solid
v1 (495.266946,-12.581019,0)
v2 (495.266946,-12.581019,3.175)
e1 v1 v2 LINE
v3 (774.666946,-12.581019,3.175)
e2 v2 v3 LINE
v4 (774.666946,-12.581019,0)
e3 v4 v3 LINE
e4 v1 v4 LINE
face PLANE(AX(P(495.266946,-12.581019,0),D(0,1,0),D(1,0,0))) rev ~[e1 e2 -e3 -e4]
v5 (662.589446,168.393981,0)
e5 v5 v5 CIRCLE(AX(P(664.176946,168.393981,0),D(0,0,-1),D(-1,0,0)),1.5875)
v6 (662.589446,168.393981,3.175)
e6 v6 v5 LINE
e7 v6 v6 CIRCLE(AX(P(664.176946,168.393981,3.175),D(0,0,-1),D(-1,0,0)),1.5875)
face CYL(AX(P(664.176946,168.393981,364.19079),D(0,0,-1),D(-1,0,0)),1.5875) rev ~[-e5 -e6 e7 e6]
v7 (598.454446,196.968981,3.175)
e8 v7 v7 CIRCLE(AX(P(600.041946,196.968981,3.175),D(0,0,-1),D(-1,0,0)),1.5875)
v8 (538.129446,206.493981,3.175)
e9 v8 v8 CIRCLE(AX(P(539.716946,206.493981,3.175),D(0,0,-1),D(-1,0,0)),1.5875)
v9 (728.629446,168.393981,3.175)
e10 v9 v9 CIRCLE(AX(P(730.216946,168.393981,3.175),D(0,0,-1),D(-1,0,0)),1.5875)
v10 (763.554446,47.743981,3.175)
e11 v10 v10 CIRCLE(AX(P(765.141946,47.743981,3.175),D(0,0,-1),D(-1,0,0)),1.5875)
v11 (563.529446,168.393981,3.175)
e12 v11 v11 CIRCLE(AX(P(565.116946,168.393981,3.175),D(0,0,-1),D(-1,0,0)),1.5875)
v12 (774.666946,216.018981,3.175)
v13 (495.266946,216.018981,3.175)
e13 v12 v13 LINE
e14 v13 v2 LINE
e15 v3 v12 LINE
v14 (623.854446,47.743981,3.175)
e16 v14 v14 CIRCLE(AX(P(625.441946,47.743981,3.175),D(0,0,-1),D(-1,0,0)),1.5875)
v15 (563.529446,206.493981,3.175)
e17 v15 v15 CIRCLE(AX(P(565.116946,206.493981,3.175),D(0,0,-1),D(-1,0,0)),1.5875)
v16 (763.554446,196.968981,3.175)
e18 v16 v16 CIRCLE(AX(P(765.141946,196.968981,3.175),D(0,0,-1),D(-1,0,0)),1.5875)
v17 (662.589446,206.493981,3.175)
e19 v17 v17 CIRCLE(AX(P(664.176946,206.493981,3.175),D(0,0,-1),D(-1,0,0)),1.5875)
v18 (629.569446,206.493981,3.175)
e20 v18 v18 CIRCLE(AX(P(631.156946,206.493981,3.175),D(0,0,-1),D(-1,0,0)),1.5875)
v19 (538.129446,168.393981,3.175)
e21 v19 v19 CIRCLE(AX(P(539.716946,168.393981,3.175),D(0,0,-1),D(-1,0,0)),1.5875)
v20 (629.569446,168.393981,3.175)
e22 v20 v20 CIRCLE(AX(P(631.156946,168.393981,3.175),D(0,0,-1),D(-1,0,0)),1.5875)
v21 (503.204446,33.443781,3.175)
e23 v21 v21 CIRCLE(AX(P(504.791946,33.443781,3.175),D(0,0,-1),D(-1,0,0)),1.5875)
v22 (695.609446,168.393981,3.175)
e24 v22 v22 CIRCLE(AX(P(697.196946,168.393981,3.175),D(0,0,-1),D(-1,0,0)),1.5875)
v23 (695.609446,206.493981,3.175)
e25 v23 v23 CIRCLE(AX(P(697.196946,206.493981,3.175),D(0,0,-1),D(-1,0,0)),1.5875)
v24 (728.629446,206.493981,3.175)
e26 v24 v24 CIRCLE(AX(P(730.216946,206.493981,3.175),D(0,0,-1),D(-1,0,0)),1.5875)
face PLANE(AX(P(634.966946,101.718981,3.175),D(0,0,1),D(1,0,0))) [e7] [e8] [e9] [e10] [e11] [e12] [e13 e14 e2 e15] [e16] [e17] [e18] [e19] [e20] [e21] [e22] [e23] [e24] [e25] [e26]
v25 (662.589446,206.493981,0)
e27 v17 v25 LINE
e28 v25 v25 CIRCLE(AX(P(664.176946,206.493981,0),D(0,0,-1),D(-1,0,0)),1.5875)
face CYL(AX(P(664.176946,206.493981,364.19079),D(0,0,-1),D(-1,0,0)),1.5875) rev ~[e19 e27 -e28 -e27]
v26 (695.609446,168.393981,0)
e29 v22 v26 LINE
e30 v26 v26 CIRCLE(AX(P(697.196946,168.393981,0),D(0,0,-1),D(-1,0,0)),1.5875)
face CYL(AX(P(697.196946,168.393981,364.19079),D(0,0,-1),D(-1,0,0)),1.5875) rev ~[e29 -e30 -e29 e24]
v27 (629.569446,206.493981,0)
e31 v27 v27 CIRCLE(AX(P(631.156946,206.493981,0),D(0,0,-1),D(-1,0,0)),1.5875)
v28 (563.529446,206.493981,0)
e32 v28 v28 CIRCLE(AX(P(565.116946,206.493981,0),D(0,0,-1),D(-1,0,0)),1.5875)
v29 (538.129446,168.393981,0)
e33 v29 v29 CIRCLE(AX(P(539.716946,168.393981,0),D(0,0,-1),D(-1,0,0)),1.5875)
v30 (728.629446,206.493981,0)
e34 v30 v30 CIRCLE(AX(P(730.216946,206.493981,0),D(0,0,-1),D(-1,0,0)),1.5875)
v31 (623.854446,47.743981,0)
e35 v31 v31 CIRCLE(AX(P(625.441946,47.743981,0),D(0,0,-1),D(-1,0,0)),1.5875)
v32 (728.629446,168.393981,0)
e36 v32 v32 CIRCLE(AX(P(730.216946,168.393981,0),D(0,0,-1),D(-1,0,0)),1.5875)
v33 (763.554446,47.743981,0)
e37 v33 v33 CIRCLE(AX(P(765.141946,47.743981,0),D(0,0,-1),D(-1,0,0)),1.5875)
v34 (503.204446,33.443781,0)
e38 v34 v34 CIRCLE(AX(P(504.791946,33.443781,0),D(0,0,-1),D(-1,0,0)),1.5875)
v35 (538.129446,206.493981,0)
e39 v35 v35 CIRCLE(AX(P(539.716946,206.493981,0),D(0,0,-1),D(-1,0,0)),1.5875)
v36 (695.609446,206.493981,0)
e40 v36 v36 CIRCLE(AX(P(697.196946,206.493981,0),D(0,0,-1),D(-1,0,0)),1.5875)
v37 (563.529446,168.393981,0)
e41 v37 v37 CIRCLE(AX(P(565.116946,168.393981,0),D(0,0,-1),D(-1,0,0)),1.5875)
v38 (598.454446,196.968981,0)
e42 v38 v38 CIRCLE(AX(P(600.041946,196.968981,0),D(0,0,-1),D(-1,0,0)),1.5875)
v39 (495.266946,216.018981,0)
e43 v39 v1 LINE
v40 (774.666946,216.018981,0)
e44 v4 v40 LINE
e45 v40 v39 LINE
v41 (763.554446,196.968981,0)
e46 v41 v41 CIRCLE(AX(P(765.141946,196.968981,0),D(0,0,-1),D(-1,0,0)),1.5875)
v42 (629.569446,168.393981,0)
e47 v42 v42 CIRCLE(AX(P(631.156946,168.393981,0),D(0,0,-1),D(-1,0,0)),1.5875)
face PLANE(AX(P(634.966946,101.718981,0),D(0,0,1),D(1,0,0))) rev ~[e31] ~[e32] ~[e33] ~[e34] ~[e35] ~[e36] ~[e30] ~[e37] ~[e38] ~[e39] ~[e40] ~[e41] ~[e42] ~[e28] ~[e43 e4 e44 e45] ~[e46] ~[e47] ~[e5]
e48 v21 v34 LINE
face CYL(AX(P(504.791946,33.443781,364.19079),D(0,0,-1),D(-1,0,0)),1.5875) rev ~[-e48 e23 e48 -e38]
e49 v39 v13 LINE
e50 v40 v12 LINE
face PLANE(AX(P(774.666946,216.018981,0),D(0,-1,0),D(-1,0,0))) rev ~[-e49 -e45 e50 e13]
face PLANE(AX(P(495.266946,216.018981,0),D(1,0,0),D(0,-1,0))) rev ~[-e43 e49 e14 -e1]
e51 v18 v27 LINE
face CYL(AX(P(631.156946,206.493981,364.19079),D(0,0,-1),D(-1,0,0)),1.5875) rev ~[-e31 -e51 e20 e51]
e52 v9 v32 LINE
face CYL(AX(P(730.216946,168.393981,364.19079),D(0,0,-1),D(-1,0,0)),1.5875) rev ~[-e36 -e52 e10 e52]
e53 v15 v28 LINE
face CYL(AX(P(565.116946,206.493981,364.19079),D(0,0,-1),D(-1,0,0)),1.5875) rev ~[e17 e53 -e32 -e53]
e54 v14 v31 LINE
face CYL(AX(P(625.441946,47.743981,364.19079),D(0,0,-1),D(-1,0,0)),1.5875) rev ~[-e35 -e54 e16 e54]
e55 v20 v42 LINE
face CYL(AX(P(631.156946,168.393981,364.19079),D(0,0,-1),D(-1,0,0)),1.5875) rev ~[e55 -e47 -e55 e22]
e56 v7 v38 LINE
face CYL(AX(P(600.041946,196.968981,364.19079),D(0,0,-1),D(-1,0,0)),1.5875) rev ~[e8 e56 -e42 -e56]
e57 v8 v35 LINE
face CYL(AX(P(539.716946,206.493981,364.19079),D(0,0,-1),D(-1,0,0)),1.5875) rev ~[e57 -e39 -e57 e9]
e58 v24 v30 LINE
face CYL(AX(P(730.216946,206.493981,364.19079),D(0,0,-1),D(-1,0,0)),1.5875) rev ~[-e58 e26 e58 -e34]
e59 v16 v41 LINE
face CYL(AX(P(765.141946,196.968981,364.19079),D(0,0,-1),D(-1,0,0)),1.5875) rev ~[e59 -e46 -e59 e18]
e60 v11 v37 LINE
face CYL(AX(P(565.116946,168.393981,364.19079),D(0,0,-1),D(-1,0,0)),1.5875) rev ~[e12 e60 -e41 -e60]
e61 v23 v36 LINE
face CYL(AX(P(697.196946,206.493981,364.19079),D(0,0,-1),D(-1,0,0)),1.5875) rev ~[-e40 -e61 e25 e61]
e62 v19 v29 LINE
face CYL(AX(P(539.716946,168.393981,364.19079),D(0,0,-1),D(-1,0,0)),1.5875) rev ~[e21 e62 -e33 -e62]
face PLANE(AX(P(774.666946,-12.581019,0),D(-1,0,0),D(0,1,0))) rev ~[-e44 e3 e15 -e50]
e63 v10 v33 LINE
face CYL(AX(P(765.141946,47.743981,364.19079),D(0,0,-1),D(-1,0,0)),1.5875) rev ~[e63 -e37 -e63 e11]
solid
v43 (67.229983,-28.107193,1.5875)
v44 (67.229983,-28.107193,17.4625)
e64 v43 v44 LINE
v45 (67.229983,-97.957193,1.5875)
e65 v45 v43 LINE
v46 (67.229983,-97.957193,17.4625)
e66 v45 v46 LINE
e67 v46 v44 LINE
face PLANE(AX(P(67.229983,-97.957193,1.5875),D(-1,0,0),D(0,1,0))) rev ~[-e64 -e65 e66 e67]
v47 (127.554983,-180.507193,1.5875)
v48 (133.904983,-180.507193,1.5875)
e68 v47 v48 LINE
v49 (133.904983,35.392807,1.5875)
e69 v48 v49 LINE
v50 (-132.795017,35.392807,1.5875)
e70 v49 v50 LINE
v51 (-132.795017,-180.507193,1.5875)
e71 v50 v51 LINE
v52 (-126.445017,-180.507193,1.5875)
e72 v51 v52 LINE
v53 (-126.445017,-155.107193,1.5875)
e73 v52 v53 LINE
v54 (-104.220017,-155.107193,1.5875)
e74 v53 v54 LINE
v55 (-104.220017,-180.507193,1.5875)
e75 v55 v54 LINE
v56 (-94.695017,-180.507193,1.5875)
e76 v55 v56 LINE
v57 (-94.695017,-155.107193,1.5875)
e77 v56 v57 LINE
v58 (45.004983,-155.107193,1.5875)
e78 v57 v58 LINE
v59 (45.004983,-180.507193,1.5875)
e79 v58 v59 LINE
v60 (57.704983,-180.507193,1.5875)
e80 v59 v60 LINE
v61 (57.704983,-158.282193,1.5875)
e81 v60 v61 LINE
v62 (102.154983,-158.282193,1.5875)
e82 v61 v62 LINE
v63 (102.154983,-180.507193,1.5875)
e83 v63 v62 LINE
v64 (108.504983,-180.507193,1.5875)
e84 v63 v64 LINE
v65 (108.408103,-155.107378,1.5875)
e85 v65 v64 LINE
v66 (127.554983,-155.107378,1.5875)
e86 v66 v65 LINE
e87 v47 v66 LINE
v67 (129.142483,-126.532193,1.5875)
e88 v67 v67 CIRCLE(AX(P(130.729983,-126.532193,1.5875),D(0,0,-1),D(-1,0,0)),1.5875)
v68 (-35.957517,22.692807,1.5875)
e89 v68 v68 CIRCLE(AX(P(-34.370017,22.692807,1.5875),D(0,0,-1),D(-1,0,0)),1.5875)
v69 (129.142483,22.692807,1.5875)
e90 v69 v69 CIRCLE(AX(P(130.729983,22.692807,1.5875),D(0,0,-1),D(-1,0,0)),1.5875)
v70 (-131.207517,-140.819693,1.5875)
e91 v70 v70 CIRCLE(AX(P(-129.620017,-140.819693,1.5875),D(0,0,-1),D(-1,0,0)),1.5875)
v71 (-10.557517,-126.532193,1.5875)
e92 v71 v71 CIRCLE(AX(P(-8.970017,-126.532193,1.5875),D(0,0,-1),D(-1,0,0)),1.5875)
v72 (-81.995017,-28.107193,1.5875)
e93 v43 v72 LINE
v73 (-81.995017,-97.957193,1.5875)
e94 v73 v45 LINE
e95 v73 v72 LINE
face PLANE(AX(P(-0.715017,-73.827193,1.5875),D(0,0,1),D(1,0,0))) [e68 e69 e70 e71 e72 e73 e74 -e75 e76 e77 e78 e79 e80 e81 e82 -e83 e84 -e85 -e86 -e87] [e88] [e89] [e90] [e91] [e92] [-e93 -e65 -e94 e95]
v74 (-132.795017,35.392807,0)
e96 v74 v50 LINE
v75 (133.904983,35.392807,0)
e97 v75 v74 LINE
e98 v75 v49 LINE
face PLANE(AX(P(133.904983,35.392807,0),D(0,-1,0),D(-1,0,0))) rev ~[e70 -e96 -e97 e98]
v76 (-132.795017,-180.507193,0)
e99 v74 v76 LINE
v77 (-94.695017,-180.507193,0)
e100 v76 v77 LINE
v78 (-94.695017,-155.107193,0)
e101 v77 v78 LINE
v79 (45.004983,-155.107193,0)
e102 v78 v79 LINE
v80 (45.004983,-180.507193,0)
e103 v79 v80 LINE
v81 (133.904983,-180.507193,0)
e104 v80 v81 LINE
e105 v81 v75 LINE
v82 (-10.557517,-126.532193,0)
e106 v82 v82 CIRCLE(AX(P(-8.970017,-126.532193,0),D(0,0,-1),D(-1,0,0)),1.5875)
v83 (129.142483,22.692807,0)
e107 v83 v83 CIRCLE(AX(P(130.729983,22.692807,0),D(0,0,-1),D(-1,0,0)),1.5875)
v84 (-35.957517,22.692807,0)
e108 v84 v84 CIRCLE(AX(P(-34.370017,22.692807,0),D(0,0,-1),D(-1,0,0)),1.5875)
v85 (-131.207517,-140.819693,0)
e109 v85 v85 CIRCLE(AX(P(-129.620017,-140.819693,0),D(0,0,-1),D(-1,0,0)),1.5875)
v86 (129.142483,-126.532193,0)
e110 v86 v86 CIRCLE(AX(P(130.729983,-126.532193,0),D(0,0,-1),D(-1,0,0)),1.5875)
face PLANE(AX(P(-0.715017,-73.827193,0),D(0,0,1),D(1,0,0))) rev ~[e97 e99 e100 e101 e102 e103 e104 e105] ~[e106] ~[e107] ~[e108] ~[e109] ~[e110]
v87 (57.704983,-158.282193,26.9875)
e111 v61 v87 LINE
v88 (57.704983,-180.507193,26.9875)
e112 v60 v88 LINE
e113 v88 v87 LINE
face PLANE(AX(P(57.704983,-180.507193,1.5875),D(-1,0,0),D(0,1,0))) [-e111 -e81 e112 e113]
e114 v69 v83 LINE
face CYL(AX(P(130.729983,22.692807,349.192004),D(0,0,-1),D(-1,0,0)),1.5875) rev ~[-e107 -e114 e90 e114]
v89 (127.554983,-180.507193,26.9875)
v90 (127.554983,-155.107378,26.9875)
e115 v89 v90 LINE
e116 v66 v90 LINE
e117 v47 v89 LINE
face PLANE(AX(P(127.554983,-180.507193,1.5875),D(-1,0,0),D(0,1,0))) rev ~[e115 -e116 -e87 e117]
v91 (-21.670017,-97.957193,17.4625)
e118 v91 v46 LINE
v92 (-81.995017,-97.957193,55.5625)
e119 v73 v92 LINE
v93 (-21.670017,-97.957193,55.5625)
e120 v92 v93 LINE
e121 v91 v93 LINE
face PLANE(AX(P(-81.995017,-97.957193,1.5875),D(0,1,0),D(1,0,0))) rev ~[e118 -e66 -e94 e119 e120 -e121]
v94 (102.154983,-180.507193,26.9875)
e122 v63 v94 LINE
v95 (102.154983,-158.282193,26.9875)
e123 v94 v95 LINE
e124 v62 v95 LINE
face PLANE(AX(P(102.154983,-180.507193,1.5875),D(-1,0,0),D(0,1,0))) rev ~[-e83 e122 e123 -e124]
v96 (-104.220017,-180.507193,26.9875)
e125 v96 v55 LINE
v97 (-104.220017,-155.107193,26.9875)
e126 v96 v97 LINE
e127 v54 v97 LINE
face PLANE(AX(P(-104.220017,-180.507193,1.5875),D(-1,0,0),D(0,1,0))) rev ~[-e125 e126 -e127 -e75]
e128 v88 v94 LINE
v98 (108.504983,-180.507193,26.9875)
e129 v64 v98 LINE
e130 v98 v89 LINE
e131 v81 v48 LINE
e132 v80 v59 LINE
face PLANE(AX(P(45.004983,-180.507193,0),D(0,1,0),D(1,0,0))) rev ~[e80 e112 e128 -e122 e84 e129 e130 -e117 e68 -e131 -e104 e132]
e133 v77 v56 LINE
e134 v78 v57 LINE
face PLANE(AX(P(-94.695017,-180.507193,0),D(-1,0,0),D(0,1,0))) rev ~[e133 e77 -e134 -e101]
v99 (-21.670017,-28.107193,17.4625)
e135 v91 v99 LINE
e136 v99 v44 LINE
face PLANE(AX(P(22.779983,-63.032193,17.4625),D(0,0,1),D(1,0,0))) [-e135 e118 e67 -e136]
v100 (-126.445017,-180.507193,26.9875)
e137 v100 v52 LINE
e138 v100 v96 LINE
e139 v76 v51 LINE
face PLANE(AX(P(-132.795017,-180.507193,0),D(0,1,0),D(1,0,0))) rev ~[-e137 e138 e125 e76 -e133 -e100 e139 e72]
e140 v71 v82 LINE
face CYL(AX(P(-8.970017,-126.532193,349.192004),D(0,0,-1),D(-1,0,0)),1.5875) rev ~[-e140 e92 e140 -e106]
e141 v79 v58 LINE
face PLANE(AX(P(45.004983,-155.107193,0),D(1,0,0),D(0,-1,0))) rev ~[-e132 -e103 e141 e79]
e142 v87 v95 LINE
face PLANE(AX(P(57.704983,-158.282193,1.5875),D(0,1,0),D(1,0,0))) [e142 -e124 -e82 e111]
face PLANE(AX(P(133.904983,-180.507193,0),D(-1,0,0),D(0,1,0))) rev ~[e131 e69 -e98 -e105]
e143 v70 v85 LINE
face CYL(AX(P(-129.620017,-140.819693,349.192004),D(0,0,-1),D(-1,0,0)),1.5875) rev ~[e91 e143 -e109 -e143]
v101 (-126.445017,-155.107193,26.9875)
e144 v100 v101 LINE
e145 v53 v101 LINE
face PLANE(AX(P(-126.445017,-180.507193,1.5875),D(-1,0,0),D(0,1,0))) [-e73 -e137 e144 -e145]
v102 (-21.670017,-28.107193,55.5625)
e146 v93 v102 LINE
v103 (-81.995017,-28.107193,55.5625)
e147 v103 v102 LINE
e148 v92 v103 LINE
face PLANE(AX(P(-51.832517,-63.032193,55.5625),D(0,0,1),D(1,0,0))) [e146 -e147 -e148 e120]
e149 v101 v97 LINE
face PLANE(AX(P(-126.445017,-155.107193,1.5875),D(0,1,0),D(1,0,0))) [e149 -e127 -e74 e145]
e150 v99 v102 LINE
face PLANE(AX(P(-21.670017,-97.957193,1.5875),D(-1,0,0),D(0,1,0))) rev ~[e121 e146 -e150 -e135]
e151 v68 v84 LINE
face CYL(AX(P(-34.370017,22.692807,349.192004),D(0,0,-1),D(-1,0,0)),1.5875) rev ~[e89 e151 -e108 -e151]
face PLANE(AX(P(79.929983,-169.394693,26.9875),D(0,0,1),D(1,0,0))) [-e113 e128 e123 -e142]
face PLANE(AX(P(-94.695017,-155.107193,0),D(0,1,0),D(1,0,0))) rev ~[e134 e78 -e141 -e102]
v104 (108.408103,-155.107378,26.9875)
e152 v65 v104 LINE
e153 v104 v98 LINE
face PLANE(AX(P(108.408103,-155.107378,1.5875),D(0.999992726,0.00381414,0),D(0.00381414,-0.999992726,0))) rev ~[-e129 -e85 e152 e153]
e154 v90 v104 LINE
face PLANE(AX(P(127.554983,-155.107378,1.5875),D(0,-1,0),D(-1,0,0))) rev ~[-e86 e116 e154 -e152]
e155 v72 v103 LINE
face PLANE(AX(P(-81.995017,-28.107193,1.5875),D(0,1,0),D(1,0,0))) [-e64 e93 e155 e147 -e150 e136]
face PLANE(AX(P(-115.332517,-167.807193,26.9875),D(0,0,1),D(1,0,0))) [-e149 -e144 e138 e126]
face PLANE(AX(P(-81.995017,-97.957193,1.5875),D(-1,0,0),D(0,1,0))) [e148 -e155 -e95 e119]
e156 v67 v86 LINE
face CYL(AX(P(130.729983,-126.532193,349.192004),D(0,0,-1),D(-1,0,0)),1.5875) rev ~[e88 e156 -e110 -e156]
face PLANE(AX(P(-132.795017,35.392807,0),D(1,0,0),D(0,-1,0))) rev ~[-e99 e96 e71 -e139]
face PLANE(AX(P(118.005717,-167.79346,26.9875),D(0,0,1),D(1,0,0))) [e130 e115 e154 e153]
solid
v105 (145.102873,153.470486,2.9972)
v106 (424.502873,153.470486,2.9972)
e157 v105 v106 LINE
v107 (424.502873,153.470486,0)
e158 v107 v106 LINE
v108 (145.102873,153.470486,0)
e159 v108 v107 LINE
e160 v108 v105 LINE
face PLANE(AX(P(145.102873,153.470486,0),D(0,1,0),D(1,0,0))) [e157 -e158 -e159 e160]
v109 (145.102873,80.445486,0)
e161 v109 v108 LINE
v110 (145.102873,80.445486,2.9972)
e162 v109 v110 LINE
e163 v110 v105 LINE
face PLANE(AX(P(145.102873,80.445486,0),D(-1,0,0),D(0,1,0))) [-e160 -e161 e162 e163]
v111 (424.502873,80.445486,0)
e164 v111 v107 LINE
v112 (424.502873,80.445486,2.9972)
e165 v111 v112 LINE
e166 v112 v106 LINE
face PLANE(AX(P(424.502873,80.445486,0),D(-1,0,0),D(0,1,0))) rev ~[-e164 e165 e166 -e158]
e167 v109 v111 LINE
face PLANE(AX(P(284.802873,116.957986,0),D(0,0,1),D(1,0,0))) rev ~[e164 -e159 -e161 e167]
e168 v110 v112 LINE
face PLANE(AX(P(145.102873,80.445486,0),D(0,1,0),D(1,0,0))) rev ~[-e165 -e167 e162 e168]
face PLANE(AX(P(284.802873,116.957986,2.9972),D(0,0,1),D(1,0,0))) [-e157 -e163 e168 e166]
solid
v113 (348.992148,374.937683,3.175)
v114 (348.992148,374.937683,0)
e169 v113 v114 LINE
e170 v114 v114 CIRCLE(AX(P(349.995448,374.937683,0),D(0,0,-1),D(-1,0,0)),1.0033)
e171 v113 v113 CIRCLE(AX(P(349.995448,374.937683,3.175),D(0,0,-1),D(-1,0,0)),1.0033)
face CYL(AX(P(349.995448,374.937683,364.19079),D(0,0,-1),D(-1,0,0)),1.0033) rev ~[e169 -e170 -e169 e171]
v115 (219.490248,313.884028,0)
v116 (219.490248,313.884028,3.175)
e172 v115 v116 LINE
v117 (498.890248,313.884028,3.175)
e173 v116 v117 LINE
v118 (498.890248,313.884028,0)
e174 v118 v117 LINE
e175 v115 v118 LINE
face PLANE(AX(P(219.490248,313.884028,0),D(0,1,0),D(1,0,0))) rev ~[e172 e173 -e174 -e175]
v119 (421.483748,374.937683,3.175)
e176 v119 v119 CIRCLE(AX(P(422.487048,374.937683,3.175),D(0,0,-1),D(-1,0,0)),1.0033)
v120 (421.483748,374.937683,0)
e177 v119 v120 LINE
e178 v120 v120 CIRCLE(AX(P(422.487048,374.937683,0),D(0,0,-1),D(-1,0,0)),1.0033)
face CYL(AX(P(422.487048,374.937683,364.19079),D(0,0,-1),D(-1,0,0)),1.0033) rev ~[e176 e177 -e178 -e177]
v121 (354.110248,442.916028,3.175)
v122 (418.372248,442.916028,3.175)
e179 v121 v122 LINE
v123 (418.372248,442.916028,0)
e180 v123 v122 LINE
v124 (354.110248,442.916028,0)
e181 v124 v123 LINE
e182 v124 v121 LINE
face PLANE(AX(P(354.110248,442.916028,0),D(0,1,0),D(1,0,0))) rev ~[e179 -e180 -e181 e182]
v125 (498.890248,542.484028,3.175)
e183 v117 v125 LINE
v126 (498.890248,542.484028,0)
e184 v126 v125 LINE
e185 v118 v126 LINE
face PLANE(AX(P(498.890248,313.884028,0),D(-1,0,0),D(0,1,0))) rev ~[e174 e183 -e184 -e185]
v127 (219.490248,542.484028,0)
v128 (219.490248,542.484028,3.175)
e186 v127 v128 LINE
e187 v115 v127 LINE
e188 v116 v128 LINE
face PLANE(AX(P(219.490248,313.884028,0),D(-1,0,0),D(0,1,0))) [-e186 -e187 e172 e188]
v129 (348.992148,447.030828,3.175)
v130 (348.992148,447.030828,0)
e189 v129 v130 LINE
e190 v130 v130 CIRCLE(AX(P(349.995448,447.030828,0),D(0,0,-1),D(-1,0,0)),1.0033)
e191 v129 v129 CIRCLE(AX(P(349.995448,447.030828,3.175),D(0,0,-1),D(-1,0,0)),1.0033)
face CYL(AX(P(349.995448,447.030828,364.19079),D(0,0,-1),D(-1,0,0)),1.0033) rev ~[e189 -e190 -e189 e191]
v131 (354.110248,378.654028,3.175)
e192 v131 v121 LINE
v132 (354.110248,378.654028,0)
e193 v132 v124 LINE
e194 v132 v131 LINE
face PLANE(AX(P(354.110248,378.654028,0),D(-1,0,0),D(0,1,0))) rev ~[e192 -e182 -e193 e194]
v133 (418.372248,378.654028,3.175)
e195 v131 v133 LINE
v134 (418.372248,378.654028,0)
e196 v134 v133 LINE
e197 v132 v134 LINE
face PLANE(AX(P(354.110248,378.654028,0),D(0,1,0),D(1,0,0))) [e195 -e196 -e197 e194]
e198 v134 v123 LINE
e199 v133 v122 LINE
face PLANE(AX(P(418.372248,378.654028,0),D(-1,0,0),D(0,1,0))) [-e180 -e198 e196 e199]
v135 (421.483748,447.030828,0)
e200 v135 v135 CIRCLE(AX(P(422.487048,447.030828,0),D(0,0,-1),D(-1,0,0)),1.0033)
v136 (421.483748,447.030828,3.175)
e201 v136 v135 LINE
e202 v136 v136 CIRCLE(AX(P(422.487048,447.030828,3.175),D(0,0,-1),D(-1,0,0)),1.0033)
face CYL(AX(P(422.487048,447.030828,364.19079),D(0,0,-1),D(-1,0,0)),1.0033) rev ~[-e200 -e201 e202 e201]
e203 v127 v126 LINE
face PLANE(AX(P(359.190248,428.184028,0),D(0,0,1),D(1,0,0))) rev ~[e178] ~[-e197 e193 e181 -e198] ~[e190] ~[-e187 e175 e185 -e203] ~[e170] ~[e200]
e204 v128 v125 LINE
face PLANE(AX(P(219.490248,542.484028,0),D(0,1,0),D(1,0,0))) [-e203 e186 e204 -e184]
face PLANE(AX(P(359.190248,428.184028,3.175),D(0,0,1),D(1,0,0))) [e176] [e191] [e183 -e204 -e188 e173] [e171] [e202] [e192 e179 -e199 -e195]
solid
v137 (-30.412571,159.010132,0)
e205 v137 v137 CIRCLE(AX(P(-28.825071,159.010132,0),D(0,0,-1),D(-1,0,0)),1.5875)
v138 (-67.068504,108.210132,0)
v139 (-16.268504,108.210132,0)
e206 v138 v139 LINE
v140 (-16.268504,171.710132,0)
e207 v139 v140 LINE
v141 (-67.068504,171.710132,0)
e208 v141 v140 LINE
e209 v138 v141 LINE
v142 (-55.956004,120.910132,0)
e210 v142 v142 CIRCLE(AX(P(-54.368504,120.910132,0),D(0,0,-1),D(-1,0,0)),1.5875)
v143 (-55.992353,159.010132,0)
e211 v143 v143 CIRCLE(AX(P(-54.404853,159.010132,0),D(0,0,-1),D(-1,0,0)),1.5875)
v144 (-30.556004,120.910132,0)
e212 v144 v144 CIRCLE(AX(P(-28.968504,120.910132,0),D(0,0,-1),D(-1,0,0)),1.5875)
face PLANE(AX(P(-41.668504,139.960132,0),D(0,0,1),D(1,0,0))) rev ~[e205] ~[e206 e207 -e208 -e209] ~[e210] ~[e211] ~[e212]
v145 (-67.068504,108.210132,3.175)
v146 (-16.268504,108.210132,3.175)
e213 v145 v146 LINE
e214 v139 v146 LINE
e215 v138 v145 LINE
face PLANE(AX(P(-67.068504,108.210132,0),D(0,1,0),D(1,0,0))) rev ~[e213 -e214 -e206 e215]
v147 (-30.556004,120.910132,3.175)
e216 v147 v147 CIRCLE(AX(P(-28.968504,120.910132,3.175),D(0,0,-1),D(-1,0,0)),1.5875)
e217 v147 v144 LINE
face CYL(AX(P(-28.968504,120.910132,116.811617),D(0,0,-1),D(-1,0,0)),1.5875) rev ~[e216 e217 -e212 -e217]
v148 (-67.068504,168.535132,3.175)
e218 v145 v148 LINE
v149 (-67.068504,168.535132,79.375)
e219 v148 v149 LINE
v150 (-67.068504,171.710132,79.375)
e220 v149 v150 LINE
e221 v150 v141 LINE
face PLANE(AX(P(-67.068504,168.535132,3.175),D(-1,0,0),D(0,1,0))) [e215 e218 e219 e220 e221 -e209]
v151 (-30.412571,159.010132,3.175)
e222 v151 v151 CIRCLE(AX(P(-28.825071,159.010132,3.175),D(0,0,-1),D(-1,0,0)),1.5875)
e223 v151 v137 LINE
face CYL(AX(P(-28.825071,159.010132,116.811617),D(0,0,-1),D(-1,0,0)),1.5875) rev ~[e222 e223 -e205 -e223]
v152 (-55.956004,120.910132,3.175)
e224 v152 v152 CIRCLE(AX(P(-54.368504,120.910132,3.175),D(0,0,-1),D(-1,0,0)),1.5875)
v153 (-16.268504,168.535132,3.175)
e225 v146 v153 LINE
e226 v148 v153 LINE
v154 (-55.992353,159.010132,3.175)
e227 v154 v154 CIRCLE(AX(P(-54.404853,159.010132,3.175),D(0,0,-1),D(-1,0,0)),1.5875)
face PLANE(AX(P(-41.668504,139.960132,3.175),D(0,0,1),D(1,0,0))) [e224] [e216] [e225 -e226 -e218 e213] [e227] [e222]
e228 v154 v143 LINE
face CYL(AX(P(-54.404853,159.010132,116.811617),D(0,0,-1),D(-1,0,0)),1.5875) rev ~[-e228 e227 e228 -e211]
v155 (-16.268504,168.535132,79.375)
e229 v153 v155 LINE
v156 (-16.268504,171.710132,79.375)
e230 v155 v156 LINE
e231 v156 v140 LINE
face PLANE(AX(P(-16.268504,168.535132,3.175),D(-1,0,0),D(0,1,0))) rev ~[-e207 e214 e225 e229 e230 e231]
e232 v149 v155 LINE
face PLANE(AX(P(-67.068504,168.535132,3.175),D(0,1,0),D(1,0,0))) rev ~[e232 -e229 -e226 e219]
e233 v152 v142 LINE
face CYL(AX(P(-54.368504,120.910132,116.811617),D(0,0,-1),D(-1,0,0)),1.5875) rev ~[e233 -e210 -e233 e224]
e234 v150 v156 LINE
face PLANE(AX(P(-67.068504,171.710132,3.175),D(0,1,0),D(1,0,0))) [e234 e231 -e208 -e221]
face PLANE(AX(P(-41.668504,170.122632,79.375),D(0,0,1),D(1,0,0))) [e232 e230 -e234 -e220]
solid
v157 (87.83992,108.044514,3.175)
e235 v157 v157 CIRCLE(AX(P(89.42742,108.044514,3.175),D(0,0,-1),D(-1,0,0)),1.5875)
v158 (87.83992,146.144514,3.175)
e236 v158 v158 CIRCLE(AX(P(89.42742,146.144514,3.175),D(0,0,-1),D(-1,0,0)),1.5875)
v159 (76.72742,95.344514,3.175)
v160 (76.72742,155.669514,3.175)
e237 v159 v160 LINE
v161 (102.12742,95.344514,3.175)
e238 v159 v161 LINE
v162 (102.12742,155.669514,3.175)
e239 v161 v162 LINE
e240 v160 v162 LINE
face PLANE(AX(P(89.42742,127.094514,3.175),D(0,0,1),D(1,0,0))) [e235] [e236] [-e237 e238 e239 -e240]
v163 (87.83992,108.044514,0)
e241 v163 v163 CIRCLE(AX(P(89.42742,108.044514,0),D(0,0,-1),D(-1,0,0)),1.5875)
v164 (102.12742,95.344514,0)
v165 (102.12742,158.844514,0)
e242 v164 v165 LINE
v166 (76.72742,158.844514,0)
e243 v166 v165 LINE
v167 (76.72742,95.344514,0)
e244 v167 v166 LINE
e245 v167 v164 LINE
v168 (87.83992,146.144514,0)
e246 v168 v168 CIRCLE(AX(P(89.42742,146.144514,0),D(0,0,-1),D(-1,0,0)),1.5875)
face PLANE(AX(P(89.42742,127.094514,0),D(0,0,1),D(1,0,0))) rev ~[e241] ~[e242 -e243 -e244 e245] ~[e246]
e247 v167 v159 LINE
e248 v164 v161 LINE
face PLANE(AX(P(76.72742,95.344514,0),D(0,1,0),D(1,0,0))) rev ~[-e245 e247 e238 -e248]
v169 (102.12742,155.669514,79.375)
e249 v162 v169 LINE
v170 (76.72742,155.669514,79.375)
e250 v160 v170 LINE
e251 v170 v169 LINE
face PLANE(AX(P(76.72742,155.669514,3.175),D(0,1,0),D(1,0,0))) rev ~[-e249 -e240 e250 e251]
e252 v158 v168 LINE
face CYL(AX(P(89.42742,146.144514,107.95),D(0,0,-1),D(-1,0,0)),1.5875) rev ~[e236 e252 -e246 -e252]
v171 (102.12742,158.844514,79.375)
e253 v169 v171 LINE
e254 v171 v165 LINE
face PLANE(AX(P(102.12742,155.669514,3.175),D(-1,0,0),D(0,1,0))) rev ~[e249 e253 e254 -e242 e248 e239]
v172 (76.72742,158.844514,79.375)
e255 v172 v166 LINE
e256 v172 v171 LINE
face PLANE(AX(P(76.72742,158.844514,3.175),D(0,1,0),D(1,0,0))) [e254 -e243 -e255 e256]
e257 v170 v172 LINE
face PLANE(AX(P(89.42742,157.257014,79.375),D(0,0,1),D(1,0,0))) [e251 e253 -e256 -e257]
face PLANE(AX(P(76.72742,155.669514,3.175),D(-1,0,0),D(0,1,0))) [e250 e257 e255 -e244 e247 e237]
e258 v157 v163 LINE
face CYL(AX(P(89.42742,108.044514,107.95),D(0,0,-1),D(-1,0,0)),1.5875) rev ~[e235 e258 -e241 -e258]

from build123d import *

# Parameters (mm, degrees)
F1_DEPTH  = 1.5875
F2_W      = 22.225
F2_H      = 25.4
F3_DEPTH  = 22.225
F2_W_2    = 44.45
F2_H_2    = 22.225
F4_DEPTH  = 25.4
F5_W      = 88.9
F5_H      = 69.85
F6_DEPTH  = 15.875
F7_W      = 60.325
F7_H      = 69.85
F8_DEPTH  = 53.975
F10_DEPTH = 3.175
F11_W     = 50.8
F11_H     = 63.5
F12_DEPTH = 3.175
F11_W_2   = 25.4
F13_W     = 50.8
F13_H     = 3.175
F14_DEPTH = 76.2
F16_D     = 3.175
F18_D     = 3.175
F20_D     = 3.175
F21_W     = 25.4
F21_H     = 3.175
F22_DEPTH = 76.2
F24_D     = 3.175
F25_W     = 279.4
F25_H     = 73.025
F26_DEPTH = 2.9972
F27_W     = 279.4
F27_H     = 228.6
F27_W_2   = 79.502
F27_H_2   = 79.502
F27_W_3   = 64.262
F27_H_3   = 64.262
F28_DEPTH = 3.175
F30_D     = 2.0066


# Not quite as in the source:
# - a feature names something its author has since deleted; it is built from what else it names


with BuildPart() as f1:
    # F0 (on Top) → F1 (new body)
    with BuildSketch(Plane.XY):
        Polygon((133.9049825728, 35.3928071586), (-132.7950174272, 35.3928071586), (-132.7950174272, -180.5071928414), (-94.6950174272, -180.5071928414), (-94.6950174272, -155.1071928414), (45.0049825728, -155.1071928414), (45.0049825728, -180.5071928414), (133.9049825728, -180.5071928414), align=None)
    extrude(amount=F1_DEPTH)

    # F2 (on face) → F3 (join)
    with BuildSketch(Plane.XY.offset(1.5875)):
        with Locations((-115.3325174272, -167.8071928414)):
            Rectangle(F2_W, F2_H)
    extrude(amount=F3_DEPTH)

    # F2 (on face) → F4 (join)
    with BuildSketch(Plane.XY.offset(1.5875)):
        with Locations((-115.3325174272, -167.8071928414)):
            Rectangle(F2_W, F2_H)
        with Locations((79.9299825728, -169.3946928414)):
            Rectangle(F2_W_2, F2_H_2)
        Polygon((127.5549825728, -155.1073775974), (108.4081034214, -155.1073775974), (108.5049825728, -180.5071928414), (127.5549825728, -180.5071928414), align=None)
    extrude(amount=F4_DEPTH)

    # F5 (on face) → F6 (join)
    with BuildSketch(Plane.XY.offset(1.5875)):
        with Locations((22.7799825728, -63.0321928414)):
            Rectangle(F5_W, F5_H)
    extrude(amount=F6_DEPTH)

    # F7 (on face) → F8 (join)
    with BuildSketch(Plane.XY.offset(1.5875)):
        with Locations((-51.8325174272, -63.0321928414)):
            Rectangle(F7_W, F7_H)
    extrude(amount=F8_DEPTH)

    # F16 (through all)
    with Locations(Plane.XY.offset(1.5875)):
        with Locations((-129.6200174272, -140.8196928414), (-8.9700174272, -126.5321928414), (130.7299825728, -126.5321928414), (130.7299825728, 22.6928071586), (-34.3700174272, 22.6928071586)):
            Hole(F16_D / 2)


with BuildPart() as f10:
    # F9 (on Top) → F10 (new body)
    with BuildSketch(Plane.XY):
        Polygon((774.6669458253, 216.0189813188), (495.2669458253, 216.0189813188), (495.2669458253, -12.5810186812), (539.7169458253, -12.5810186812), (692.1169458253, -12.5810186812), (774.6669458253, -12.5810186812), align=None)
    extrude(amount=F10_DEPTH)

    # F18 (through all)
    with Locations(Plane.XY.offset(3.175)):
        with Locations((504.7919458253, 33.4437813188), (625.4419458253, 47.7439813188), (765.1419458253, 47.7439813188), (765.1419458253, 196.9689813188), (600.0419458253, 196.9689813188), (565.1169458253, 168.3939813188), (565.1169458253, 206.4939813188), (539.7169458253, 206.4939813188), (539.7169458253, 168.3939813188), (631.1569458253, 206.4939813188), (664.1769458253, 206.4939813188), (697.1969458253, 206.4939813188), (730.2169458253, 206.4939813188), (664.1769458253, 168.3939813188), (697.1969458253, 168.3939813188), (730.2169458253, 168.3939813188), (631.1569458253, 168.3939813188)):
            Hole(F18_D / 2)


with BuildPart() as f12:
    # F11 (on Top) → F12 (new body)
    with BuildSketch(Plane.XY):
        with Locations((-41.6685035452, 139.9601322776)):
            Rectangle(F11_W, F11_H)
    extrude(amount=F12_DEPTH)

    # F13 (on face) → F14 (join)
    with BuildSketch(Plane.XY.offset(3.175)):
        with Locations((-41.6685035452, 170.1226322776)):
            Rectangle(F13_W, F13_H)
    extrude(amount=F14_DEPTH)

    # F20 (through all)
    with Locations(Plane.XY.offset(3.175)):
        with Locations((-54.3685035452, 120.9101322776), (-28.9685035452, 120.9101322776), (-28.825070553, 159.0101322776), (-54.4048526267, 159.0101322776)):
            Hole(F20_D / 2)


with BuildPart() as f12b:
    # F11 (on Top) → F12, piece 2 (new body)
    with BuildSketch(Plane.XY):
        with Locations((89.4274200916, 127.0945136547)):
            Rectangle(F11_W_2, F11_H)
    extrude(amount=F12_DEPTH)

    # F21 (on face) → F22 (join)
    with BuildSketch(Plane.XY.offset(3.175)):
        with Locations((89.4274200916, 157.2570136547)):
            Rectangle(F21_W, F21_H)
    extrude(amount=F22_DEPTH)

    # F24 (through all)
    with Locations(Plane.XY.offset(3.175)):
        with Locations((89.4274200916, 146.1445136547), (89.4274200916, 108.0445136547)):
            Hole(F24_D / 2)


with BuildPart() as f26:
    # F25 (on Top) → F26 (new body)
    with BuildSketch(Plane.XY):
        with Locations((284.80287323, 116.9579862564)):
            Rectangle(F25_W, F25_H)
    extrude(amount=F26_DEPTH)


with BuildPart() as f28:
    # F27 (on Top) → F28 (new body)
    with BuildSketch(Plane.XY):
        with Locations((359.1902479529, 428.1840278369)):
            Rectangle(F27_W, F27_H)
        with Locations((386.2412479529, 410.7850278369)):
            Rectangle(F27_W_2, F27_H_2, mode=Mode.SUBTRACT)
        with Locations((386.2412479529, 410.7850278369)):
            Rectangle(F27_W_2, F27_H_2)
        with Locations((386.2412479529, 410.7850278369)):
            Rectangle(F27_W_3, F27_H_3, mode=Mode.SUBTRACT)
    extrude(amount=F28_DEPTH)

    # F30 (through all)
    with Locations(Plane.XY.offset(3.175)):
        with Locations((349.9954479529, 447.0308278369), (422.4870479529, 447.0308278369), (422.4870479529, 374.9376833439), (349.9954479529, 374.9376833439)):
            Hole(F30_D / 2)


solid = Compound([f1.part, f10.part, f12.part, f12b.part, f26.part, f28.part])
